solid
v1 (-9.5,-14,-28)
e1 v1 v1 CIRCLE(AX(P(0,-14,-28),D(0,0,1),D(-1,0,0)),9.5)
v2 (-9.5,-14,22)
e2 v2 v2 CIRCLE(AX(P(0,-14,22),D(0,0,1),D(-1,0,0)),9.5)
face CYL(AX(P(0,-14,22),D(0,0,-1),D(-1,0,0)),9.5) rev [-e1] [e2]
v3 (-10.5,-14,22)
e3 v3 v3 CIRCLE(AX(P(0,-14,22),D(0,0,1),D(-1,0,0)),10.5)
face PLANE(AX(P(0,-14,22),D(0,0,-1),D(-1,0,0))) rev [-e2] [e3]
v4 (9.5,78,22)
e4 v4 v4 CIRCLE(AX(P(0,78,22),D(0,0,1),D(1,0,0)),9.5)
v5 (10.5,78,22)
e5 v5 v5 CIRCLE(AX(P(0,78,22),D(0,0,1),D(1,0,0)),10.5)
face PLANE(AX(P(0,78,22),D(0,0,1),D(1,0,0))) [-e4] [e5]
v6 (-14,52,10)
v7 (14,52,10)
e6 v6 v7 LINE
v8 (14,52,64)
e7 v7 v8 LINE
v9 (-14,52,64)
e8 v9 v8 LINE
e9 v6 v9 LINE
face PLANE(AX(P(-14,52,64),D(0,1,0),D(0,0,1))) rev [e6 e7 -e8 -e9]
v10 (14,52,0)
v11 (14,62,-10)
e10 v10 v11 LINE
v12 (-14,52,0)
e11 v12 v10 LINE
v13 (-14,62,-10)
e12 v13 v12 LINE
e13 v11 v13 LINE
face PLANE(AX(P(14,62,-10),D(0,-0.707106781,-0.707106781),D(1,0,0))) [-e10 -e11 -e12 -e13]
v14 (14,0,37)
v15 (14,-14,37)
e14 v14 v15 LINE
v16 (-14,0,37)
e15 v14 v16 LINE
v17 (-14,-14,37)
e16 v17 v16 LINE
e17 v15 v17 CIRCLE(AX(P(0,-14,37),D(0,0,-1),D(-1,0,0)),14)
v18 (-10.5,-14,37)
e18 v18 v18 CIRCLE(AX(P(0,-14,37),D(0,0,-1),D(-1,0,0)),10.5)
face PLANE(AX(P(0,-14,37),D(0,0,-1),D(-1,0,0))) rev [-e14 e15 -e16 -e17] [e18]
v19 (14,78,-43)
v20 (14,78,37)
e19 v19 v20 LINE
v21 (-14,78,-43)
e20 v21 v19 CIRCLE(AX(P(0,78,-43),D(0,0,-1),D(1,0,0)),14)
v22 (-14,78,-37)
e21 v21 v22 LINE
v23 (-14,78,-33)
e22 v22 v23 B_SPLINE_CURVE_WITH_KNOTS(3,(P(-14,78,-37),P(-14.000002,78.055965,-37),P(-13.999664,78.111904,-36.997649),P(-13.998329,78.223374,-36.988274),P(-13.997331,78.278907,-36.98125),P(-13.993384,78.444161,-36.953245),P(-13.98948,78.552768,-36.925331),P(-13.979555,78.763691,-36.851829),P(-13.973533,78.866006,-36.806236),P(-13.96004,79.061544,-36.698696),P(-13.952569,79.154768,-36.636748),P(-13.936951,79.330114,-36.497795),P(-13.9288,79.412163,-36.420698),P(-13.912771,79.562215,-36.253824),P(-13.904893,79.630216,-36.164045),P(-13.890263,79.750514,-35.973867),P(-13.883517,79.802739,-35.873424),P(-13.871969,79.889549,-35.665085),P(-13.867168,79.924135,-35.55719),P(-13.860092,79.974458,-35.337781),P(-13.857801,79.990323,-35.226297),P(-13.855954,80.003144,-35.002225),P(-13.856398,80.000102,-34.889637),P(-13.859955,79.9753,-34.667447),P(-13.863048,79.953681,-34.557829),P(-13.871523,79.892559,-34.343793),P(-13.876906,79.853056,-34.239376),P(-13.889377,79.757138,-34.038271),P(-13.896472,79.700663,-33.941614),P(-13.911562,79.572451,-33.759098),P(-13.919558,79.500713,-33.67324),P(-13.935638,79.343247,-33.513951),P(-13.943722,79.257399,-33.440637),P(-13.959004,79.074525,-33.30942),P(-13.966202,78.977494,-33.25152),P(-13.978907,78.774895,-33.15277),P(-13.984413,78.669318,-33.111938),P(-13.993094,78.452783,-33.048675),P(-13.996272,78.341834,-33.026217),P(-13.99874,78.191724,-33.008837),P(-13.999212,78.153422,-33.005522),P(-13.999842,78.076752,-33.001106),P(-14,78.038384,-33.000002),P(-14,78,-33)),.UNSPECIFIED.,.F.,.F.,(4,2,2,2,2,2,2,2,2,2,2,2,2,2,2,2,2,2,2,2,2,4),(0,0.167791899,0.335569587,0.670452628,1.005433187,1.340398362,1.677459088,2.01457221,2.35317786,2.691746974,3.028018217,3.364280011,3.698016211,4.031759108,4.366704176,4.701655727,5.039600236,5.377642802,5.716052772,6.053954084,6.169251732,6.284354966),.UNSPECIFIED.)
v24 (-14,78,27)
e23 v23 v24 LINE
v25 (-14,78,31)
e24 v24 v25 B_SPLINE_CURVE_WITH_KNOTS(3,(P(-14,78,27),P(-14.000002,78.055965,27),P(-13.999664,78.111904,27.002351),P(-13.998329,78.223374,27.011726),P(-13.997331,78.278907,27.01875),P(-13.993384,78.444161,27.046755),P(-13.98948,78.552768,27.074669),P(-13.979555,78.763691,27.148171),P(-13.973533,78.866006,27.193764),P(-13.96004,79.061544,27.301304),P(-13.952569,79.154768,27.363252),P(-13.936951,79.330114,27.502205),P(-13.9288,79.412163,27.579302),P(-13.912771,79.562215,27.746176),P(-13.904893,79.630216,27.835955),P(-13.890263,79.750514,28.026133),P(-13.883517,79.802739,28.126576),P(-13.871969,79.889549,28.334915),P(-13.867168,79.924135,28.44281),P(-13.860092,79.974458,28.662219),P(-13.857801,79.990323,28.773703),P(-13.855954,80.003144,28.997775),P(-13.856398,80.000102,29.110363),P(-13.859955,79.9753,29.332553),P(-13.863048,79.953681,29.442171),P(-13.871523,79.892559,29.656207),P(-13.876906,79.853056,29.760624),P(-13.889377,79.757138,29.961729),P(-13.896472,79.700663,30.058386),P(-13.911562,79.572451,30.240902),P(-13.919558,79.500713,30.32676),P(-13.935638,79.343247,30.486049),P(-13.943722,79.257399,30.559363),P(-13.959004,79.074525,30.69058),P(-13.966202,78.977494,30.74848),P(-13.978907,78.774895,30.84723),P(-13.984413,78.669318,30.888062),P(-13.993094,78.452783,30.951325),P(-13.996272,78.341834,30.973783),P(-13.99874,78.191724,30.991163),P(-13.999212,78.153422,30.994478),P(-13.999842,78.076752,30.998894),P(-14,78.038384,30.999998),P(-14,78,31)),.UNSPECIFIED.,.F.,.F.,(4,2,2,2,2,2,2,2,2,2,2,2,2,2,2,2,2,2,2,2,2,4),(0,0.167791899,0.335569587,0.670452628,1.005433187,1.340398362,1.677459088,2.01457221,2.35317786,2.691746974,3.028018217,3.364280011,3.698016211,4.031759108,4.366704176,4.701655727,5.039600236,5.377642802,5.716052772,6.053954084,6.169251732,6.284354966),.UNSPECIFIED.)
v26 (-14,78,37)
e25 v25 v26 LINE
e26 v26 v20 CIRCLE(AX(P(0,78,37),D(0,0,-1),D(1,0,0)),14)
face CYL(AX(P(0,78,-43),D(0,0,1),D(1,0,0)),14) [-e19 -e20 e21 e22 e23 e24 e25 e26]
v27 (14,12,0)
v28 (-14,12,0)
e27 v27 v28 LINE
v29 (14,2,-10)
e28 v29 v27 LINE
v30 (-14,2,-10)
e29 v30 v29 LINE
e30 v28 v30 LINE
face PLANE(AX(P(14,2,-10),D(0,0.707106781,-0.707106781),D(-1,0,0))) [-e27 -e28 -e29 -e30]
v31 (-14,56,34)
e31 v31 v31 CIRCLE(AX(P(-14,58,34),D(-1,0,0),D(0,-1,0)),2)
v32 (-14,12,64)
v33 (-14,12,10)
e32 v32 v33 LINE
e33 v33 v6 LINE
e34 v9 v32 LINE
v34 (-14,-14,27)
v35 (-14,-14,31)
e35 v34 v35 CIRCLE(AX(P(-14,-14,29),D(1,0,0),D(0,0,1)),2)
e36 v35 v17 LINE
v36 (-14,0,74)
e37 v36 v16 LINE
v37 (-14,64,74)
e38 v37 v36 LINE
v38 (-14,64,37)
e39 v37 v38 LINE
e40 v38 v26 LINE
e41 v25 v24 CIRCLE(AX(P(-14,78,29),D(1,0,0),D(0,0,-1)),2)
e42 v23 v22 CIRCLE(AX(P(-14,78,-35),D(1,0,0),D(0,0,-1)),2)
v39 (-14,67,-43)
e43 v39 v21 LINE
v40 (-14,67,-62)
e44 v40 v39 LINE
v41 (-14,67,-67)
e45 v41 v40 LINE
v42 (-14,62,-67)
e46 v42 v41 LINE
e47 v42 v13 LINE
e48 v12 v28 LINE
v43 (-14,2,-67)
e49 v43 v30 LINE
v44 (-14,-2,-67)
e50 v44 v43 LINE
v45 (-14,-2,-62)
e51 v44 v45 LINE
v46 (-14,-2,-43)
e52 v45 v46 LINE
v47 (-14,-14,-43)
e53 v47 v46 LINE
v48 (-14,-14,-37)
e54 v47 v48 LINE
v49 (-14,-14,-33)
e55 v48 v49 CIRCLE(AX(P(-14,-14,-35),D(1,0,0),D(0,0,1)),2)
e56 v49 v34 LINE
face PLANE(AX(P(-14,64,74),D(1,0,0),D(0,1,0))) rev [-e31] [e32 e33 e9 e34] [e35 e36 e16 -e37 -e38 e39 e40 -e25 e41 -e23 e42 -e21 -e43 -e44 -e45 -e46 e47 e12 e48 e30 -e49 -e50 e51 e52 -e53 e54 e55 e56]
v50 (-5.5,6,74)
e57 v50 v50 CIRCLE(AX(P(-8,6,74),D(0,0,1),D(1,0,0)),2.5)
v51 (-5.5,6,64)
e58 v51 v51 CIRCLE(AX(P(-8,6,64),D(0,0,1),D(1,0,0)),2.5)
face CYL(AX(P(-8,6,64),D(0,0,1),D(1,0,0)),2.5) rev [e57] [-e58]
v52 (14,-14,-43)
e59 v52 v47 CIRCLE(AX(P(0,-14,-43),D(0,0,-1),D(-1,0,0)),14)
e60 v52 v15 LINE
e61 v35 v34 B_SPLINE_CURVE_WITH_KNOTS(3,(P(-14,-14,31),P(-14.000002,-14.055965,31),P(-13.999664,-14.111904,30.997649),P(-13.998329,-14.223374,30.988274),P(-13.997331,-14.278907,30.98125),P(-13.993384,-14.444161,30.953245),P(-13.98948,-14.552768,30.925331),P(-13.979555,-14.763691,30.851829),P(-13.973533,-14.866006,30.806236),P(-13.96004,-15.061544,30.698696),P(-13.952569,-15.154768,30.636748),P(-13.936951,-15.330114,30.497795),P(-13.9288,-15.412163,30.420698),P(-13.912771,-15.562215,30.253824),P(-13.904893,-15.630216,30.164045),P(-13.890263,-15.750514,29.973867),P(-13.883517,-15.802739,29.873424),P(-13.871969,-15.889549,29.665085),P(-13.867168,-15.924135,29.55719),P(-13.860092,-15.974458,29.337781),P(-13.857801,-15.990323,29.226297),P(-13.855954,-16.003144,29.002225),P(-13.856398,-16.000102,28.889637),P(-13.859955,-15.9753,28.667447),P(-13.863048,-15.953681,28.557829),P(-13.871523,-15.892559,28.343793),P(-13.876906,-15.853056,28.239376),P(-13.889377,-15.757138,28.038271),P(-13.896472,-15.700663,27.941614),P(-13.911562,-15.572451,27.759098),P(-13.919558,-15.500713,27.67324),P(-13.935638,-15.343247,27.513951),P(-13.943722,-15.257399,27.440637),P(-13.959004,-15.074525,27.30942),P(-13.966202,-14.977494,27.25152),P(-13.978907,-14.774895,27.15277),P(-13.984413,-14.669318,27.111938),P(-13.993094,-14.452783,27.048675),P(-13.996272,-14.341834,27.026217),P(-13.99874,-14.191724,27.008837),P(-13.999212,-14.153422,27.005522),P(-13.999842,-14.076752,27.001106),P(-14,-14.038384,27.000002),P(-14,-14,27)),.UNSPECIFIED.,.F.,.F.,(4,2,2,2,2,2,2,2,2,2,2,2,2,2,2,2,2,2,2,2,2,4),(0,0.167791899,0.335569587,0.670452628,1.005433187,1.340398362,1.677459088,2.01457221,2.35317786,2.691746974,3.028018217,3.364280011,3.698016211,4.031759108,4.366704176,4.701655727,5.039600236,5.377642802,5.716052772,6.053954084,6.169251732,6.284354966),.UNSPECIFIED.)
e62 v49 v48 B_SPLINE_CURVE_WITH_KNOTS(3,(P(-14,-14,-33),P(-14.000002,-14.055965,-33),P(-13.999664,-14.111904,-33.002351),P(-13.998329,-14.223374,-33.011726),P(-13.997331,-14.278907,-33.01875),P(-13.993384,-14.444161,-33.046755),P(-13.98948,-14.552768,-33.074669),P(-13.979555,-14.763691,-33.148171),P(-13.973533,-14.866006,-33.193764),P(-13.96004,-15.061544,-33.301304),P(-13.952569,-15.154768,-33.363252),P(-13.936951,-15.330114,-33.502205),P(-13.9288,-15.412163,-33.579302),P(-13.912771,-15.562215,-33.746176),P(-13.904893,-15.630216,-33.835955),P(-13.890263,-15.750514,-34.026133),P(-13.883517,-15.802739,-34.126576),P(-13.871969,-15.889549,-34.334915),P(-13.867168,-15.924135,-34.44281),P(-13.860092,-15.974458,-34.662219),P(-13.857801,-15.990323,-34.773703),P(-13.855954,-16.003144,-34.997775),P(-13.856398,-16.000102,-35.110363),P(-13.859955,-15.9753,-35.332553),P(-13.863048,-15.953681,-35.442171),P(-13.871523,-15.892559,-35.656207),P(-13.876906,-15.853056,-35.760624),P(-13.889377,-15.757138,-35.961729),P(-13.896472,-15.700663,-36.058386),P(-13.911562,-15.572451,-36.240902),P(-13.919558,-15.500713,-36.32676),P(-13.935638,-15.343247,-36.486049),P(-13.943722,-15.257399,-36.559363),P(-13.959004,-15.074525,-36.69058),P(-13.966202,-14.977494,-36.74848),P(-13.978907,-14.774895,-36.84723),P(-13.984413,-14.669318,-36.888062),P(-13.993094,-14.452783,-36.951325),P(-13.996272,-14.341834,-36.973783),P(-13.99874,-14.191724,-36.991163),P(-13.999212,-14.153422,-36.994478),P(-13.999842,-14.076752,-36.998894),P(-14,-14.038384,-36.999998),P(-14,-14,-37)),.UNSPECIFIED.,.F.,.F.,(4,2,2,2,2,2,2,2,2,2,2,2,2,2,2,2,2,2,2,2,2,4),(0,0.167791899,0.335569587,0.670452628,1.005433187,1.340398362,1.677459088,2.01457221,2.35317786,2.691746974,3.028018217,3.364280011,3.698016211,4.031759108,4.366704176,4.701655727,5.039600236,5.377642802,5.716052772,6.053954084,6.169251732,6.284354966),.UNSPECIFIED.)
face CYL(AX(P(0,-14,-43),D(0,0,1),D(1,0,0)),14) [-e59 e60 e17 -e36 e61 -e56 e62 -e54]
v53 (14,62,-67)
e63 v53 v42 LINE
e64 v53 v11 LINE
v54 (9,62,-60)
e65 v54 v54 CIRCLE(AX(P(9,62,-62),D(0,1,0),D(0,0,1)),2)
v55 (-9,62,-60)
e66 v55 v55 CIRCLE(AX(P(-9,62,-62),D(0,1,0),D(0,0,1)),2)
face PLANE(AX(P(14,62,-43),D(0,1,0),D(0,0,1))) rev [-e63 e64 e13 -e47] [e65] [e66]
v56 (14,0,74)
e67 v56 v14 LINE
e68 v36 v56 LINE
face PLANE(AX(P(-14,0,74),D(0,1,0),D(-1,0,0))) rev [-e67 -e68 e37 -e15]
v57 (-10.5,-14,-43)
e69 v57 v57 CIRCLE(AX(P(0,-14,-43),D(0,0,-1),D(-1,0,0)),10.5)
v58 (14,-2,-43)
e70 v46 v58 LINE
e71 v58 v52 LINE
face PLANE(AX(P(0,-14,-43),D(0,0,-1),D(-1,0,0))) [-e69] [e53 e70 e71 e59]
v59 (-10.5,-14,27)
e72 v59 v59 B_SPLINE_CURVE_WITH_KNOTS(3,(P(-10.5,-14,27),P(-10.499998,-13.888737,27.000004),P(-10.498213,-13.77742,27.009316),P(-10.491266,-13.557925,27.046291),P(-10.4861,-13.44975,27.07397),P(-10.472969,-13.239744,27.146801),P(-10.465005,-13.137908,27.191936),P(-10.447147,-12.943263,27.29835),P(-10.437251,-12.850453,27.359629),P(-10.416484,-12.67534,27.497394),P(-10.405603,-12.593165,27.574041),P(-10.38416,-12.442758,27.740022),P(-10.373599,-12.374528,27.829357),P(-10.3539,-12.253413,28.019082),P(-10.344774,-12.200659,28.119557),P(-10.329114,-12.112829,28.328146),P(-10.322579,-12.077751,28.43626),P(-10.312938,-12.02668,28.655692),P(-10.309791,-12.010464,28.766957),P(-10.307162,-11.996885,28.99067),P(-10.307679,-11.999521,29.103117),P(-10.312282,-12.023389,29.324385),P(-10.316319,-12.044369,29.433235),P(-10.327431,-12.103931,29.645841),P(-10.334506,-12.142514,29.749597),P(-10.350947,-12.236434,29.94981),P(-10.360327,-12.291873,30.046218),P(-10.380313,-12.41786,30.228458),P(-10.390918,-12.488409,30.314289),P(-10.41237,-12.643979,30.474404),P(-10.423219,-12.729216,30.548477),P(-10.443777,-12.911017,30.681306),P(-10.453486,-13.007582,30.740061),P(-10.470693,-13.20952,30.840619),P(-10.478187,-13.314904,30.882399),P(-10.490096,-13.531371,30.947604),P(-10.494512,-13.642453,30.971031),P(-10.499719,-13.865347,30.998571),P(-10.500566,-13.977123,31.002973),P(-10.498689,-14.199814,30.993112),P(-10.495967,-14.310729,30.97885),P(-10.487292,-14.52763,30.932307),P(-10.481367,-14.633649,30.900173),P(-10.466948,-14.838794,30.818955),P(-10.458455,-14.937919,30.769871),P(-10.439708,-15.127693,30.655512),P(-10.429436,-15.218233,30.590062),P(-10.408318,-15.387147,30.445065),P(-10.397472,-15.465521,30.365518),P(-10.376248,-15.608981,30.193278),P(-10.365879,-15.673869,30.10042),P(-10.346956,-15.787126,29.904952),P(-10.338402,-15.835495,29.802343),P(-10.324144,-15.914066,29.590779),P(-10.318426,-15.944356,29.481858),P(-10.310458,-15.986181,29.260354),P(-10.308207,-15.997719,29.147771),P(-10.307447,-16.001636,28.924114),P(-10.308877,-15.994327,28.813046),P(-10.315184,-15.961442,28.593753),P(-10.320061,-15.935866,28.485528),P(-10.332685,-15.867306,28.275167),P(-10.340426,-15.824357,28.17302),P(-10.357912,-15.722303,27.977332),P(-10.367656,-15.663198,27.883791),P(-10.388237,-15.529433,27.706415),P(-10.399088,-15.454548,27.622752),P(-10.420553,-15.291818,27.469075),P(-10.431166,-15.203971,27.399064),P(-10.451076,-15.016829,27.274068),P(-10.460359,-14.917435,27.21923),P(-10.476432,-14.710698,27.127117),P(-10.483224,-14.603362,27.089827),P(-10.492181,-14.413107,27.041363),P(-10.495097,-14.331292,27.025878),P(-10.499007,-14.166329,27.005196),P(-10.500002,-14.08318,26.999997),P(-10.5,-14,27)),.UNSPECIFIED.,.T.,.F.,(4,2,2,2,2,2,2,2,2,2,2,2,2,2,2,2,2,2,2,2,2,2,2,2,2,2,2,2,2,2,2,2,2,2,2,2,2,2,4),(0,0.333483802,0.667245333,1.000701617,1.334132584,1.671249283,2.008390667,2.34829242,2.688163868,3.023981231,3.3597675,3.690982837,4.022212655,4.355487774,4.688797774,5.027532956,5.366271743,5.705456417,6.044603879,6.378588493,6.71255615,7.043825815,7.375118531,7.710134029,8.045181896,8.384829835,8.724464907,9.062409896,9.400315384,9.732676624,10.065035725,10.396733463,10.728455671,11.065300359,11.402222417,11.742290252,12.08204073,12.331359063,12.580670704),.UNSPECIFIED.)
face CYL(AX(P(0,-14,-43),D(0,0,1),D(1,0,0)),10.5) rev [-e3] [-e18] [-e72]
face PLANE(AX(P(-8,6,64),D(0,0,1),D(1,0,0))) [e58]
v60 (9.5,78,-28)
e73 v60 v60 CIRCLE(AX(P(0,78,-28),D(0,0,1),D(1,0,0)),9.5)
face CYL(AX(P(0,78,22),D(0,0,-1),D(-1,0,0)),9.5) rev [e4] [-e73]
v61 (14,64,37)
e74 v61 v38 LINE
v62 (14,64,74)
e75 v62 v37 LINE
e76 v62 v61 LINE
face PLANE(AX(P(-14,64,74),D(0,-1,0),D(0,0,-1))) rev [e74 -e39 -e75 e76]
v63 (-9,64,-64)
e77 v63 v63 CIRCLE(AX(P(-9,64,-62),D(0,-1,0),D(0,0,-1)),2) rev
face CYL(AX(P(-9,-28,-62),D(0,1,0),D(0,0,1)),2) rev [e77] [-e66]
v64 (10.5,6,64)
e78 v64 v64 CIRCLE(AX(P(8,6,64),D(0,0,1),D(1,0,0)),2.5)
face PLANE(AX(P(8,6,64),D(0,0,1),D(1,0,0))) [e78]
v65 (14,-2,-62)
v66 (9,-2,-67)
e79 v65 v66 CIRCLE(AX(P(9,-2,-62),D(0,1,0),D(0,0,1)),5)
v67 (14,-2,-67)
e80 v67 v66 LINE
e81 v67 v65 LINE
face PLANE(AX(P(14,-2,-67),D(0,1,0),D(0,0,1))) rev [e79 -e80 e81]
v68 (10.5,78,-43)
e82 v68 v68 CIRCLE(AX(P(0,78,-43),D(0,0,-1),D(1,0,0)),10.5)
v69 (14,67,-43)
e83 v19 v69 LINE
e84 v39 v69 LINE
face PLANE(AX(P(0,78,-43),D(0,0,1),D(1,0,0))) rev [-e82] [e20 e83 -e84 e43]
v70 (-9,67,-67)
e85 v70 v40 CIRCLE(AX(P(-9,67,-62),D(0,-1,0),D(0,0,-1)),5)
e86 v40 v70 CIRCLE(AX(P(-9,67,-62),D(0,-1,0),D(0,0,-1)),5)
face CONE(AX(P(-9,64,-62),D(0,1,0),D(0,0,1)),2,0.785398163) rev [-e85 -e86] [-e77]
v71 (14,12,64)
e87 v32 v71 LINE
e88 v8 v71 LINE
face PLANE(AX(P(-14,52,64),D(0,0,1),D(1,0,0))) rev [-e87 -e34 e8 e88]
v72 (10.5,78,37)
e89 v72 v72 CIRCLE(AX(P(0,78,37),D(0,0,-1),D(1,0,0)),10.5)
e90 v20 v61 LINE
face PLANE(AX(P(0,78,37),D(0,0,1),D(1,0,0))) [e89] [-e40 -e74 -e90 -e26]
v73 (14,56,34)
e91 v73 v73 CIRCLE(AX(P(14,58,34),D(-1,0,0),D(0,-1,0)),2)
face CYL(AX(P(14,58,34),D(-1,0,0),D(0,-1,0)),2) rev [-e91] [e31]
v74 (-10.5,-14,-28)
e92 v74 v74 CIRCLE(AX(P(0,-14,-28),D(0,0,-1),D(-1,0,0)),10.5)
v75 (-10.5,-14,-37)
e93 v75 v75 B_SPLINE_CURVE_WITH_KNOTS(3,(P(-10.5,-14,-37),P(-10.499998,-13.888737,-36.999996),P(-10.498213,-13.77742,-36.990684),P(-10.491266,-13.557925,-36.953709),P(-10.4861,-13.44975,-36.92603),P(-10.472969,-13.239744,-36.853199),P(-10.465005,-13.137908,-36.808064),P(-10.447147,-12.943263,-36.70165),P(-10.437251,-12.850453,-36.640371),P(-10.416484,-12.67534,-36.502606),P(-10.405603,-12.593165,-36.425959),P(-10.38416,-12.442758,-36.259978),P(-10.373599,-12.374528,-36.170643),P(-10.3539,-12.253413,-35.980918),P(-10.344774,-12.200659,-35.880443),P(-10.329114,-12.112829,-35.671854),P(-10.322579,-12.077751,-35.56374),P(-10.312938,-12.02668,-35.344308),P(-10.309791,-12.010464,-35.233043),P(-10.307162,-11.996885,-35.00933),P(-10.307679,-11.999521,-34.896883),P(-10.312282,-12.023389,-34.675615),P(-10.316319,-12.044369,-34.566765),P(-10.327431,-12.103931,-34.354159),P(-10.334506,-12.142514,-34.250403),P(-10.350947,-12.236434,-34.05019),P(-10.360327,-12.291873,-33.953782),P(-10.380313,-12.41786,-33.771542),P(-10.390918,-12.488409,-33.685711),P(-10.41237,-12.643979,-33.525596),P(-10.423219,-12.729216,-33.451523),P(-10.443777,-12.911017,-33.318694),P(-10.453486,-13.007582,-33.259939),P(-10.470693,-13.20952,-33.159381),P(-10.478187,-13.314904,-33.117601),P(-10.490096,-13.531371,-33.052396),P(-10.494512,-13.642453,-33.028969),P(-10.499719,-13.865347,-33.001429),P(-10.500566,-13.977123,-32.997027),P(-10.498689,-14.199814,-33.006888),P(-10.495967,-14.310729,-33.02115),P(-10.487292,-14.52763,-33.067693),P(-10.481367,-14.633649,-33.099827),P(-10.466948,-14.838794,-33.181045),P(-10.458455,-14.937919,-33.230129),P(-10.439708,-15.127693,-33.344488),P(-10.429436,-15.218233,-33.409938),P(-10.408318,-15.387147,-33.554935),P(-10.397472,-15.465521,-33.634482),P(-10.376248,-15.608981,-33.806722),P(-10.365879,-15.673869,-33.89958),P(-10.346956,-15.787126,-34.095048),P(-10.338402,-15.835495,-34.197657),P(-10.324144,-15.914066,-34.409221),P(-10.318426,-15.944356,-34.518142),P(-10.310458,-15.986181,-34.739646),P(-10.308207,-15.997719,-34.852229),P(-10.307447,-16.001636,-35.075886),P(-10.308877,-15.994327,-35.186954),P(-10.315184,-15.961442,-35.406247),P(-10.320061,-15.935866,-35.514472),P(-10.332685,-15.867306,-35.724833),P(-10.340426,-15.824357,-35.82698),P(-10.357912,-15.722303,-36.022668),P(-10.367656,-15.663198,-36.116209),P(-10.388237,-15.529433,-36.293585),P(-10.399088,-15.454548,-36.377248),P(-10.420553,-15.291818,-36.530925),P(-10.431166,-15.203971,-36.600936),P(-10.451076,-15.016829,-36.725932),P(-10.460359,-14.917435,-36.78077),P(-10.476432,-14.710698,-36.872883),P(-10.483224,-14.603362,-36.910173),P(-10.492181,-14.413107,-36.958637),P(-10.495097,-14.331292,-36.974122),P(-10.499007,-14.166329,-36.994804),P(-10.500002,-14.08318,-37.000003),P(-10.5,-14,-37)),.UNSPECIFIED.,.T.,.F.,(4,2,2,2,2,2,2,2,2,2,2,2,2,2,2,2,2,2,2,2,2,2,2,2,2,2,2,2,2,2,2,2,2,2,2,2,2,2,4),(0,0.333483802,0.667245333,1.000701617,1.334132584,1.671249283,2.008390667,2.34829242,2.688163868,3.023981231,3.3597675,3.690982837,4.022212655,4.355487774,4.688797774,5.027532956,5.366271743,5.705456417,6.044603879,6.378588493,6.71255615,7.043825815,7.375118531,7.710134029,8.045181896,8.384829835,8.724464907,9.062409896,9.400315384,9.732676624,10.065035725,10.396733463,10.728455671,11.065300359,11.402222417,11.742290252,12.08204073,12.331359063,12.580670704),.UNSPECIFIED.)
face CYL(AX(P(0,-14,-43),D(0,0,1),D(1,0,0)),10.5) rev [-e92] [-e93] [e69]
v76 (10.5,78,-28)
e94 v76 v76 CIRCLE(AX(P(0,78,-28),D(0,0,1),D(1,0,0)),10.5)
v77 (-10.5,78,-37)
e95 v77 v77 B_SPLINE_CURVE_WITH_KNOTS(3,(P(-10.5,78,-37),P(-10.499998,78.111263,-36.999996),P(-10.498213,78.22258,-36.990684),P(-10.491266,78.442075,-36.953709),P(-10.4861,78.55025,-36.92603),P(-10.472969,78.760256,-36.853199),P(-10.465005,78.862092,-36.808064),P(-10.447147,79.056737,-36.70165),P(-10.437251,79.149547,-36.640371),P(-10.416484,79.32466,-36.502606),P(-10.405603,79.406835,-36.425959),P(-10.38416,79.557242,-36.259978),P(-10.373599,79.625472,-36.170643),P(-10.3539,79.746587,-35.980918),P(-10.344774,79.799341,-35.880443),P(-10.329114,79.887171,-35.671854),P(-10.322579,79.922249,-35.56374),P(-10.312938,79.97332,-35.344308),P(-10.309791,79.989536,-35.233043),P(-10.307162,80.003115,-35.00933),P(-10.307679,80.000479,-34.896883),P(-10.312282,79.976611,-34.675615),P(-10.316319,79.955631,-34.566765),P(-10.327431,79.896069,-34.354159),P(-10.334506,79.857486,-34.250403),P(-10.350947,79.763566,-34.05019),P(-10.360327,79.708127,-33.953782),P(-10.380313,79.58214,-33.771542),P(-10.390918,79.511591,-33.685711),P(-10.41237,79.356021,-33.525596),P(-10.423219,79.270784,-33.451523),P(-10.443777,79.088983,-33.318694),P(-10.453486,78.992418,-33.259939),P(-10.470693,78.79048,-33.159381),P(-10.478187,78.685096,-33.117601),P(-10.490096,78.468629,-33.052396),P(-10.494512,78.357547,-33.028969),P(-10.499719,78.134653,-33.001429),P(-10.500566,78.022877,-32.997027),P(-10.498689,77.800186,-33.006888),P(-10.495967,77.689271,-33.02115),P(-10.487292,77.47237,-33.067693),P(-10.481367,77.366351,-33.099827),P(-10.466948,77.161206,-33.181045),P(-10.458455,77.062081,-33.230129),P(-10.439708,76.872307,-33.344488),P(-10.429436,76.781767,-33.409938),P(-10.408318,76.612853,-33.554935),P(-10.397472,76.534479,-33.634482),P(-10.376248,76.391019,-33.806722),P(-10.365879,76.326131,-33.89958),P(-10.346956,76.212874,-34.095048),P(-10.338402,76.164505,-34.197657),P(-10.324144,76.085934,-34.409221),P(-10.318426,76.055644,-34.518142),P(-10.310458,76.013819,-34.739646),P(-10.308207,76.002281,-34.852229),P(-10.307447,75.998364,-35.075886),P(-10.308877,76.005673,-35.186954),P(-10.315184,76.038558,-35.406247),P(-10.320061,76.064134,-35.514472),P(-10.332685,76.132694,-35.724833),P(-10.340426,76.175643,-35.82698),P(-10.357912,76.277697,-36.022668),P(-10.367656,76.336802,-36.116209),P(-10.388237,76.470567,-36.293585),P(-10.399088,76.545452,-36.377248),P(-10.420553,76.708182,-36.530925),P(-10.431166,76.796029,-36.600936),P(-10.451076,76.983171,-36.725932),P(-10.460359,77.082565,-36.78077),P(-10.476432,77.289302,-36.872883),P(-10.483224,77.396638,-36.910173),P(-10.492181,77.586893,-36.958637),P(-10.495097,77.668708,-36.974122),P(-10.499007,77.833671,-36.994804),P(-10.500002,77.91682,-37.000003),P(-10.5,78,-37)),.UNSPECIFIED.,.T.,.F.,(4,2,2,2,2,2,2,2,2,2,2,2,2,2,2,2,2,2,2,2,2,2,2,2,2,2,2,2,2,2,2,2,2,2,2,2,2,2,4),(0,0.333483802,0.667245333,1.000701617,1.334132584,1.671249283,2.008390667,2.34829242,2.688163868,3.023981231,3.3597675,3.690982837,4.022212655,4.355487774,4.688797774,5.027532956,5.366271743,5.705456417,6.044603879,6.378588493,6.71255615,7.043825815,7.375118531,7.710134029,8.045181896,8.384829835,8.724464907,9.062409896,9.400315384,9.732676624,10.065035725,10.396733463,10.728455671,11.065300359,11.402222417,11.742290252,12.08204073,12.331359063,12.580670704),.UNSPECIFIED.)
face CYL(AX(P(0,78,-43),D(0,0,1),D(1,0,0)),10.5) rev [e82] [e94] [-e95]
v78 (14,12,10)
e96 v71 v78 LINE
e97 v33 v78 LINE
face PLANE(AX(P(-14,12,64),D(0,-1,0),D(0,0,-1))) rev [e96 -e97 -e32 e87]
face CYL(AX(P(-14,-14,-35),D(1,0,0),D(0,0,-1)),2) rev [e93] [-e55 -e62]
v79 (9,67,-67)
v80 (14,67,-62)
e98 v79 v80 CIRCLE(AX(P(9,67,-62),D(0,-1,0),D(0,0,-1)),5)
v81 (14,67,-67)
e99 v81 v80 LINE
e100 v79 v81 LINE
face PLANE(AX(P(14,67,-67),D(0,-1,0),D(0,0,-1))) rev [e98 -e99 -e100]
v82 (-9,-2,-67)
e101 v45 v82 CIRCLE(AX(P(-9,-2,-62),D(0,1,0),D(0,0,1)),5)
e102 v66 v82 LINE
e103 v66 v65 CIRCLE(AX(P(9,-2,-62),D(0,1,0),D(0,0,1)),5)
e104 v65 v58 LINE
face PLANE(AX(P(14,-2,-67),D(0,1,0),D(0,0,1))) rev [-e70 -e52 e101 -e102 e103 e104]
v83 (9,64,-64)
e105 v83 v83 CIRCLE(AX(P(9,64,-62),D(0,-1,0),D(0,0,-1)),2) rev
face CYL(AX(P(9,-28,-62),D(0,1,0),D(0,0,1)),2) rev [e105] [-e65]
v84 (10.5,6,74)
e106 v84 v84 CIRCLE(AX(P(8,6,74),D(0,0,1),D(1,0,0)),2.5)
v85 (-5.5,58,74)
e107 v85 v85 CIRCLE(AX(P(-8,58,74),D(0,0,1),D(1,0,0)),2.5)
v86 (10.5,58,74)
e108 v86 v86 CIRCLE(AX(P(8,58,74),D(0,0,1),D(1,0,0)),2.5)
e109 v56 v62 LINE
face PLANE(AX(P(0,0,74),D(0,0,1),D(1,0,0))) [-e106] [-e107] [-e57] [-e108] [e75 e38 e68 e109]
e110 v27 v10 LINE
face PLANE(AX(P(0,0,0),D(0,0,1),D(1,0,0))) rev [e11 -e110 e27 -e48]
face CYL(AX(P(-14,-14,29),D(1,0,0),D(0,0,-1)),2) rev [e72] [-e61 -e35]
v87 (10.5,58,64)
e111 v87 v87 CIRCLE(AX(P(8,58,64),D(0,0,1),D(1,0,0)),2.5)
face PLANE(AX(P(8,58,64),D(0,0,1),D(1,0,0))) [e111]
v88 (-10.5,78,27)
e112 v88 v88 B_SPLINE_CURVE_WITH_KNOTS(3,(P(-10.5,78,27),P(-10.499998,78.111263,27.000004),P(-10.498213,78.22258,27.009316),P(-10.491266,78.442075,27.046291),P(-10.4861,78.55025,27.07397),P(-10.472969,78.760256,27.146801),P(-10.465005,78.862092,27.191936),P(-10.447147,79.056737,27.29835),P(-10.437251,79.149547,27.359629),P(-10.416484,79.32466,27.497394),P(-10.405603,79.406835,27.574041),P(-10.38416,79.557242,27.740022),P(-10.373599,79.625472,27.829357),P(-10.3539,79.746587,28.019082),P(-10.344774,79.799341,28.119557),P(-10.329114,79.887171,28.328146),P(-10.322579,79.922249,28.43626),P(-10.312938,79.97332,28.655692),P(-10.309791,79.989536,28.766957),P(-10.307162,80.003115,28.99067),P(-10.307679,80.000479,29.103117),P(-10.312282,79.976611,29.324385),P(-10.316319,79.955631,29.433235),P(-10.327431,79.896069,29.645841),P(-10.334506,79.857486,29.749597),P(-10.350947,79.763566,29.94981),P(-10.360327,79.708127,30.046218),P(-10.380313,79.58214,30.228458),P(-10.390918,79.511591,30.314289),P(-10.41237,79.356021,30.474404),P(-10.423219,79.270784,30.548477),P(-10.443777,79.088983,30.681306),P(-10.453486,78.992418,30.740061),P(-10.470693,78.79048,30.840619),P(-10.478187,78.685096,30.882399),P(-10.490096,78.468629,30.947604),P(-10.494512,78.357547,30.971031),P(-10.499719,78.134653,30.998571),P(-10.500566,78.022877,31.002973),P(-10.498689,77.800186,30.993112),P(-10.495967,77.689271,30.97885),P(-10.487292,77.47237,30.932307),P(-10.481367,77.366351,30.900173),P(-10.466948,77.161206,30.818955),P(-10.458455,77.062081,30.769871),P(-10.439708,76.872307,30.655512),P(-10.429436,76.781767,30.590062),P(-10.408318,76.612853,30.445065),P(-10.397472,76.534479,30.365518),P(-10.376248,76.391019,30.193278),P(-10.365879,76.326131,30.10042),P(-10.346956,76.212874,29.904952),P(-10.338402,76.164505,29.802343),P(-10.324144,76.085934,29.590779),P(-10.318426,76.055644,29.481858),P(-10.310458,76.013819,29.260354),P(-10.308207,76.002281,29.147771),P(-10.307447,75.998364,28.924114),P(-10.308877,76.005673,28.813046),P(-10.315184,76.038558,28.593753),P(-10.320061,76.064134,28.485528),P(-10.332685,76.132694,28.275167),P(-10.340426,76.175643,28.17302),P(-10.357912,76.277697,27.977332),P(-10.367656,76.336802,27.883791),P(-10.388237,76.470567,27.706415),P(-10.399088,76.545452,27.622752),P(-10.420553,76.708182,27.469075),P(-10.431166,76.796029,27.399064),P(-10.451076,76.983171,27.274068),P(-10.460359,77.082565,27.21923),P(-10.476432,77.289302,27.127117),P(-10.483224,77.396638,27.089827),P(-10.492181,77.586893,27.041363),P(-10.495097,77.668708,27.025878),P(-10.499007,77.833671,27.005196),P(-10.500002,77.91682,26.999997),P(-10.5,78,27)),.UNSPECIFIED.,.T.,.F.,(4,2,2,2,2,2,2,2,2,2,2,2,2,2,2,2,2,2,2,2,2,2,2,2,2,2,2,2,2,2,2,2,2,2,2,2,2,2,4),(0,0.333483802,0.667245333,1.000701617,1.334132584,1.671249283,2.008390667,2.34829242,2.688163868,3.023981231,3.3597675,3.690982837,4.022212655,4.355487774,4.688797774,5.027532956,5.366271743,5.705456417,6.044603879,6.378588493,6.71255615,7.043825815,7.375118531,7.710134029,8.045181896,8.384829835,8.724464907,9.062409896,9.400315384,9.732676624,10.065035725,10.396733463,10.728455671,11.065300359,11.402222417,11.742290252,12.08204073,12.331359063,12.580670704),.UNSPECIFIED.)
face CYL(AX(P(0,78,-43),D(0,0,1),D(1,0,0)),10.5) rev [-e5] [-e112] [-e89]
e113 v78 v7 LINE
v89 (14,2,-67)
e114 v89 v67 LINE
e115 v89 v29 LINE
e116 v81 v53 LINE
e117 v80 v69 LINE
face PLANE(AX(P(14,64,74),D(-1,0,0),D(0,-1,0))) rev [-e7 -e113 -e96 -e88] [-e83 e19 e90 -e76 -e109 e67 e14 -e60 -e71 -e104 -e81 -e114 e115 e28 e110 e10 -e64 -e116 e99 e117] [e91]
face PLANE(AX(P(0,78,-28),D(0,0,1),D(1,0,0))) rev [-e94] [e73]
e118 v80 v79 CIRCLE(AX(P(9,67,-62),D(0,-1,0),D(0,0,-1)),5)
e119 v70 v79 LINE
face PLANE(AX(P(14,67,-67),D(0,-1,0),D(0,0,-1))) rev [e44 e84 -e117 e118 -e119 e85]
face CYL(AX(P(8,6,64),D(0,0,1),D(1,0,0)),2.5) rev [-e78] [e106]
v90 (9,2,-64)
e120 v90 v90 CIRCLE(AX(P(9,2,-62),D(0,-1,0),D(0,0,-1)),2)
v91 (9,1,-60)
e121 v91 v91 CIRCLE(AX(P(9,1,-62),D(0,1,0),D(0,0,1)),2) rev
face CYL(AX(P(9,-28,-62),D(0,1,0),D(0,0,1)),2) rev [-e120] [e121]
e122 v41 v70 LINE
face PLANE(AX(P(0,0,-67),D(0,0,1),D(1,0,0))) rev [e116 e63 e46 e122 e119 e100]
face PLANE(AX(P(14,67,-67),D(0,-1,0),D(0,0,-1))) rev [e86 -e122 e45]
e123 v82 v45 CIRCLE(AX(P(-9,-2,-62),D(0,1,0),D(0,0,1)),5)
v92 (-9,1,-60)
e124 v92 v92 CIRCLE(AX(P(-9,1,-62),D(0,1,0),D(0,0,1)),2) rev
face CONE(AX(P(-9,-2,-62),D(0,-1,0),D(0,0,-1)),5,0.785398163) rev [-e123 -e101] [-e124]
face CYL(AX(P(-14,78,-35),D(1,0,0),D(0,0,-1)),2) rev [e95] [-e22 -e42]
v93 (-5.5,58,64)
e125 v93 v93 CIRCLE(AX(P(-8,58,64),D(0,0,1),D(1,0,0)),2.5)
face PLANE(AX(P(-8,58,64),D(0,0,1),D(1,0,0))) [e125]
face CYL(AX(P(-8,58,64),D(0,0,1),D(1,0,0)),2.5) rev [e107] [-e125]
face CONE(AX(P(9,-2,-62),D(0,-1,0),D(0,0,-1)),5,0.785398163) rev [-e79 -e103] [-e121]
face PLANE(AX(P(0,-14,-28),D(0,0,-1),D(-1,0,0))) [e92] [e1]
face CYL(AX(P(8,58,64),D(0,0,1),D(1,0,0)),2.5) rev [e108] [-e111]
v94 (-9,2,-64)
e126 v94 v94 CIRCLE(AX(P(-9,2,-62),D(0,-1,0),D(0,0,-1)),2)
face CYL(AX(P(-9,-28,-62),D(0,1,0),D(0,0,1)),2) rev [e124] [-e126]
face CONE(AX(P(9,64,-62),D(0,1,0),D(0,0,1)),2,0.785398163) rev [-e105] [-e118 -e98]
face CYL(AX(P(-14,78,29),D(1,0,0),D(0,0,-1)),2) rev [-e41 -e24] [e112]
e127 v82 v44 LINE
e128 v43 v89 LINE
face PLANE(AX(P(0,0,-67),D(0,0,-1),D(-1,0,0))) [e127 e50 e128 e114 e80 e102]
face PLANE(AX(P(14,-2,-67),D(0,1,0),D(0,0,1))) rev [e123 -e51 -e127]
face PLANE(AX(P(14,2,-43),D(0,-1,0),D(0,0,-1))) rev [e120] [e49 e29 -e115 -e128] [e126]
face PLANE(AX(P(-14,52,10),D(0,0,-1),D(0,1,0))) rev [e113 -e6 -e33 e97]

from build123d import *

# Parameters (mm, degrees)
SKETCH_1_W               = 28
SKETCH_1_H               = 64
EXTRUDE_1_DEPTH          = 74
SKETCH_2_R               = 2.5
CUT_EXTRUDE_1_DEPTH      = 10
CUT_EXTRUDE_2_DEPTH      = 99.833192805
CUT_EXTRUDE_2_DEPTH_BACK = 99.833192805
SKETCH_3_W               = 54
SKETCH_3_H               = 40
EXTRUDE_2_DEPTH          = 80
SKETCH_6_R               = 10.5
CUT_EXTRUDE_3_DEPTH      = 123.719191653
SKETCH_11_W              = 28
SKETCH_11_H              = 5
SKETCH_11_H_2            = 4
EXTRUDE_5_DEPTH          = 67
SKETCH_12_R              = 2
CUT_EXTRUDE_8_DEPTH      = 122.231184107
CHAMFER_1_SIZE           = 10
SKETCH_13_R              = 10.5
SKETCH_13_R_2            = 9.5
EXTRUDE_6_DEPTH          = 25
SKETCH_14_R              = 2
CUT_EXTRUDE_9_DEPTH      = 119.894911582
SKETCH_15_R              = 2
CUT_EXTRUDE_10_DEPTH     = 122.342490596
CHAMFER_2_SIZE           = 3


with BuildPart() as part:
    # 草图1 → 凸台-拉伸1 (new body)
    with BuildSketch(Plane.XY):
        with Locations((0, 32)):
            Rectangle(SKETCH_1_W, SKETCH_1_H)
    extrude(amount=EXTRUDE_1_DEPTH)

    # 草图2 → 切除-拉伸1 (cut)
    with BuildSketch(Plane.XY.offset(74)):
        with Locations((-8, 58)):
            Circle(SKETCH_2_R)
        with Locations((8, 58)):
            Circle(SKETCH_2_R)
        with Locations((-8, 6)):
            Circle(SKETCH_2_R)
        with Locations((8, 6)):
            Circle(SKETCH_2_R)
    extrude(amount=-CUT_EXTRUDE_1_DEPTH, mode=Mode.SUBTRACT)

    # 草图3 → 切除-拉伸2 (cut, two sides: drawn at the far end of the back side and taken through both)
    with BuildSketch(Plane(origin=(0, 0, 0), x_dir=(0, 0, -1), z_dir=(1, 0, 0)).offset(-CUT_EXTRUDE_2_DEPTH_BACK)):
        with Locations((-37, 32)):
            Rectangle(SKETCH_3_W, SKETCH_3_H)
    extrude(amount=CUT_EXTRUDE_2_DEPTH + CUT_EXTRUDE_2_DEPTH_BACK, mode=Mode.SUBTRACT)

    # 草图4 → 凸台-拉伸2 (add)
    with BuildSketch(Plane(origin=(0, 0, 37), x_dir=(-1, 0, 0), z_dir=(0, 0, -1))):
        with BuildLine():
            Line((-14, 2), (14, 2))
            Line((14, 2), (14, -14))
            ThreePointArc((14, -14), (0, -28), (-14, -14))
            Line((-14, -14), (-14, 2))
        make_face()
        with BuildLine():
            Line((14, 62), (14, 78))
            ThreePointArc((14, 78), (0, 92), (-14, 78))
            Line((-14, 78), (-14, 62))
            Line((-14, 62), (14, 62))
        make_face()
    extrude(amount=EXTRUDE_2_DEPTH)

    # 草图6 → 切除-拉伸3 (cut, through all)
    with BuildSketch(Plane(origin=(0, 0, 37), x_dir=(-1, 0, 0), z_dir=(0, 0, -1))):
        with Locations((0, -14)):
            Circle(SKETCH_6_R)
        with Locations(Location((0, 78, 0), (0, 0, 180))):
            Circle(SKETCH_6_R)
    extrude(amount=CUT_EXTRUDE_3_DEPTH, mode=Mode.SUBTRACT)

    # 草图11 → 凸台-拉伸5 (add)
    with BuildSketch(Plane(origin=(0, 0, 0), x_dir=(-1, 0, 0), z_dir=(0, 0, -1))):
        with Locations((0, 64.5)):
            Rectangle(SKETCH_11_W, SKETCH_11_H)
        Rectangle(SKETCH_11_W, SKETCH_11_H_2)
    extrude(amount=EXTRUDE_5_DEPTH)

    # 草图12 → 切除-拉伸8 (cut, through all)
    with BuildSketch(Plane(origin=(0, 67, 0), x_dir=(1, 0, 0), z_dir=(0, 1, 0))):
        with Locations(Location((-9, 62, 0), (0, 0, 270))):
            Circle(SKETCH_12_R)
        with Locations(Location((9, 62, 0), (0, 0, 270))):
            Circle(SKETCH_12_R)
    extrude(amount=-CUT_EXTRUDE_8_DEPTH, mode=Mode.SUBTRACT)

    # 倒角1
    chamfer_1_edges = [part.edges().sort_by_distance(p)[0] for p in [
        (0, 62, 0),
        (0, 2, 0),
    ]]
    chamfer(chamfer_1_edges, length=CHAMFER_1_SIZE)

    # 草图13 → 凸台-拉伸6 (add, symmetric)
    # profile 1 of 2: a face of its own
    with BuildSketch(Plane.XY.offset(-3)):
        with Locations((0, 78)):
            Circle(SKETCH_13_R)
        with Locations((0, 78)):
            Circle(SKETCH_13_R_2, mode=Mode.SUBTRACT)
    # profile 2 of 2: a face of its own
    with BuildSketch(Plane.XY.offset(-3)):
        with Locations(Location((0, -14, 0), (0, 0, 180))):
            Circle(SKETCH_13_R)
        with Locations(Location((0, -14, 0), (0, 0, 180))):
            Circle(SKETCH_13_R_2, mode=Mode.SUBTRACT)
    extrude(amount=EXTRUDE_6_DEPTH, both=True)

    # 草图14 → 切除-拉伸9 (cut, through all)
    with BuildSketch(Plane(origin=(0, 0, 0), x_dir=(0, 0, -1), z_dir=(1, 0, 0))):
        with Locations((-29, 78)):
            Circle(SKETCH_14_R)
        with Locations((35, 78)):
            Circle(SKETCH_14_R)
        with Locations((35, -14)):
            Circle(SKETCH_14_R)
        with Locations((-29, -14)):
            Circle(SKETCH_14_R)
    extrude(amount=-CUT_EXTRUDE_9_DEPTH, mode=Mode.SUBTRACT)

    # 草图15 → 切除-拉伸10 (cut, through all)
    with BuildSketch(Plane.ZY.offset(14)):
        with Locations(Location((34, 58, 0), (0, 0, 270))):
            Circle(SKETCH_15_R)
    extrude(amount=-CUT_EXTRUDE_10_DEPTH, mode=Mode.SUBTRACT)

    # 倒角2
    chamfer_2_edges = [part.edges().sort_by_distance(p)[0] for p in [
        (-9, -2, -64),
        (-9, 67, -64),
        (9, -2, -64),
        (9, 67, -64),
    ]]
    chamfer(chamfer_2_edges, length=CHAMFER_2_SIZE - 0.0001)  # a hair under: the kernel refuses the full size


solid = part.part
